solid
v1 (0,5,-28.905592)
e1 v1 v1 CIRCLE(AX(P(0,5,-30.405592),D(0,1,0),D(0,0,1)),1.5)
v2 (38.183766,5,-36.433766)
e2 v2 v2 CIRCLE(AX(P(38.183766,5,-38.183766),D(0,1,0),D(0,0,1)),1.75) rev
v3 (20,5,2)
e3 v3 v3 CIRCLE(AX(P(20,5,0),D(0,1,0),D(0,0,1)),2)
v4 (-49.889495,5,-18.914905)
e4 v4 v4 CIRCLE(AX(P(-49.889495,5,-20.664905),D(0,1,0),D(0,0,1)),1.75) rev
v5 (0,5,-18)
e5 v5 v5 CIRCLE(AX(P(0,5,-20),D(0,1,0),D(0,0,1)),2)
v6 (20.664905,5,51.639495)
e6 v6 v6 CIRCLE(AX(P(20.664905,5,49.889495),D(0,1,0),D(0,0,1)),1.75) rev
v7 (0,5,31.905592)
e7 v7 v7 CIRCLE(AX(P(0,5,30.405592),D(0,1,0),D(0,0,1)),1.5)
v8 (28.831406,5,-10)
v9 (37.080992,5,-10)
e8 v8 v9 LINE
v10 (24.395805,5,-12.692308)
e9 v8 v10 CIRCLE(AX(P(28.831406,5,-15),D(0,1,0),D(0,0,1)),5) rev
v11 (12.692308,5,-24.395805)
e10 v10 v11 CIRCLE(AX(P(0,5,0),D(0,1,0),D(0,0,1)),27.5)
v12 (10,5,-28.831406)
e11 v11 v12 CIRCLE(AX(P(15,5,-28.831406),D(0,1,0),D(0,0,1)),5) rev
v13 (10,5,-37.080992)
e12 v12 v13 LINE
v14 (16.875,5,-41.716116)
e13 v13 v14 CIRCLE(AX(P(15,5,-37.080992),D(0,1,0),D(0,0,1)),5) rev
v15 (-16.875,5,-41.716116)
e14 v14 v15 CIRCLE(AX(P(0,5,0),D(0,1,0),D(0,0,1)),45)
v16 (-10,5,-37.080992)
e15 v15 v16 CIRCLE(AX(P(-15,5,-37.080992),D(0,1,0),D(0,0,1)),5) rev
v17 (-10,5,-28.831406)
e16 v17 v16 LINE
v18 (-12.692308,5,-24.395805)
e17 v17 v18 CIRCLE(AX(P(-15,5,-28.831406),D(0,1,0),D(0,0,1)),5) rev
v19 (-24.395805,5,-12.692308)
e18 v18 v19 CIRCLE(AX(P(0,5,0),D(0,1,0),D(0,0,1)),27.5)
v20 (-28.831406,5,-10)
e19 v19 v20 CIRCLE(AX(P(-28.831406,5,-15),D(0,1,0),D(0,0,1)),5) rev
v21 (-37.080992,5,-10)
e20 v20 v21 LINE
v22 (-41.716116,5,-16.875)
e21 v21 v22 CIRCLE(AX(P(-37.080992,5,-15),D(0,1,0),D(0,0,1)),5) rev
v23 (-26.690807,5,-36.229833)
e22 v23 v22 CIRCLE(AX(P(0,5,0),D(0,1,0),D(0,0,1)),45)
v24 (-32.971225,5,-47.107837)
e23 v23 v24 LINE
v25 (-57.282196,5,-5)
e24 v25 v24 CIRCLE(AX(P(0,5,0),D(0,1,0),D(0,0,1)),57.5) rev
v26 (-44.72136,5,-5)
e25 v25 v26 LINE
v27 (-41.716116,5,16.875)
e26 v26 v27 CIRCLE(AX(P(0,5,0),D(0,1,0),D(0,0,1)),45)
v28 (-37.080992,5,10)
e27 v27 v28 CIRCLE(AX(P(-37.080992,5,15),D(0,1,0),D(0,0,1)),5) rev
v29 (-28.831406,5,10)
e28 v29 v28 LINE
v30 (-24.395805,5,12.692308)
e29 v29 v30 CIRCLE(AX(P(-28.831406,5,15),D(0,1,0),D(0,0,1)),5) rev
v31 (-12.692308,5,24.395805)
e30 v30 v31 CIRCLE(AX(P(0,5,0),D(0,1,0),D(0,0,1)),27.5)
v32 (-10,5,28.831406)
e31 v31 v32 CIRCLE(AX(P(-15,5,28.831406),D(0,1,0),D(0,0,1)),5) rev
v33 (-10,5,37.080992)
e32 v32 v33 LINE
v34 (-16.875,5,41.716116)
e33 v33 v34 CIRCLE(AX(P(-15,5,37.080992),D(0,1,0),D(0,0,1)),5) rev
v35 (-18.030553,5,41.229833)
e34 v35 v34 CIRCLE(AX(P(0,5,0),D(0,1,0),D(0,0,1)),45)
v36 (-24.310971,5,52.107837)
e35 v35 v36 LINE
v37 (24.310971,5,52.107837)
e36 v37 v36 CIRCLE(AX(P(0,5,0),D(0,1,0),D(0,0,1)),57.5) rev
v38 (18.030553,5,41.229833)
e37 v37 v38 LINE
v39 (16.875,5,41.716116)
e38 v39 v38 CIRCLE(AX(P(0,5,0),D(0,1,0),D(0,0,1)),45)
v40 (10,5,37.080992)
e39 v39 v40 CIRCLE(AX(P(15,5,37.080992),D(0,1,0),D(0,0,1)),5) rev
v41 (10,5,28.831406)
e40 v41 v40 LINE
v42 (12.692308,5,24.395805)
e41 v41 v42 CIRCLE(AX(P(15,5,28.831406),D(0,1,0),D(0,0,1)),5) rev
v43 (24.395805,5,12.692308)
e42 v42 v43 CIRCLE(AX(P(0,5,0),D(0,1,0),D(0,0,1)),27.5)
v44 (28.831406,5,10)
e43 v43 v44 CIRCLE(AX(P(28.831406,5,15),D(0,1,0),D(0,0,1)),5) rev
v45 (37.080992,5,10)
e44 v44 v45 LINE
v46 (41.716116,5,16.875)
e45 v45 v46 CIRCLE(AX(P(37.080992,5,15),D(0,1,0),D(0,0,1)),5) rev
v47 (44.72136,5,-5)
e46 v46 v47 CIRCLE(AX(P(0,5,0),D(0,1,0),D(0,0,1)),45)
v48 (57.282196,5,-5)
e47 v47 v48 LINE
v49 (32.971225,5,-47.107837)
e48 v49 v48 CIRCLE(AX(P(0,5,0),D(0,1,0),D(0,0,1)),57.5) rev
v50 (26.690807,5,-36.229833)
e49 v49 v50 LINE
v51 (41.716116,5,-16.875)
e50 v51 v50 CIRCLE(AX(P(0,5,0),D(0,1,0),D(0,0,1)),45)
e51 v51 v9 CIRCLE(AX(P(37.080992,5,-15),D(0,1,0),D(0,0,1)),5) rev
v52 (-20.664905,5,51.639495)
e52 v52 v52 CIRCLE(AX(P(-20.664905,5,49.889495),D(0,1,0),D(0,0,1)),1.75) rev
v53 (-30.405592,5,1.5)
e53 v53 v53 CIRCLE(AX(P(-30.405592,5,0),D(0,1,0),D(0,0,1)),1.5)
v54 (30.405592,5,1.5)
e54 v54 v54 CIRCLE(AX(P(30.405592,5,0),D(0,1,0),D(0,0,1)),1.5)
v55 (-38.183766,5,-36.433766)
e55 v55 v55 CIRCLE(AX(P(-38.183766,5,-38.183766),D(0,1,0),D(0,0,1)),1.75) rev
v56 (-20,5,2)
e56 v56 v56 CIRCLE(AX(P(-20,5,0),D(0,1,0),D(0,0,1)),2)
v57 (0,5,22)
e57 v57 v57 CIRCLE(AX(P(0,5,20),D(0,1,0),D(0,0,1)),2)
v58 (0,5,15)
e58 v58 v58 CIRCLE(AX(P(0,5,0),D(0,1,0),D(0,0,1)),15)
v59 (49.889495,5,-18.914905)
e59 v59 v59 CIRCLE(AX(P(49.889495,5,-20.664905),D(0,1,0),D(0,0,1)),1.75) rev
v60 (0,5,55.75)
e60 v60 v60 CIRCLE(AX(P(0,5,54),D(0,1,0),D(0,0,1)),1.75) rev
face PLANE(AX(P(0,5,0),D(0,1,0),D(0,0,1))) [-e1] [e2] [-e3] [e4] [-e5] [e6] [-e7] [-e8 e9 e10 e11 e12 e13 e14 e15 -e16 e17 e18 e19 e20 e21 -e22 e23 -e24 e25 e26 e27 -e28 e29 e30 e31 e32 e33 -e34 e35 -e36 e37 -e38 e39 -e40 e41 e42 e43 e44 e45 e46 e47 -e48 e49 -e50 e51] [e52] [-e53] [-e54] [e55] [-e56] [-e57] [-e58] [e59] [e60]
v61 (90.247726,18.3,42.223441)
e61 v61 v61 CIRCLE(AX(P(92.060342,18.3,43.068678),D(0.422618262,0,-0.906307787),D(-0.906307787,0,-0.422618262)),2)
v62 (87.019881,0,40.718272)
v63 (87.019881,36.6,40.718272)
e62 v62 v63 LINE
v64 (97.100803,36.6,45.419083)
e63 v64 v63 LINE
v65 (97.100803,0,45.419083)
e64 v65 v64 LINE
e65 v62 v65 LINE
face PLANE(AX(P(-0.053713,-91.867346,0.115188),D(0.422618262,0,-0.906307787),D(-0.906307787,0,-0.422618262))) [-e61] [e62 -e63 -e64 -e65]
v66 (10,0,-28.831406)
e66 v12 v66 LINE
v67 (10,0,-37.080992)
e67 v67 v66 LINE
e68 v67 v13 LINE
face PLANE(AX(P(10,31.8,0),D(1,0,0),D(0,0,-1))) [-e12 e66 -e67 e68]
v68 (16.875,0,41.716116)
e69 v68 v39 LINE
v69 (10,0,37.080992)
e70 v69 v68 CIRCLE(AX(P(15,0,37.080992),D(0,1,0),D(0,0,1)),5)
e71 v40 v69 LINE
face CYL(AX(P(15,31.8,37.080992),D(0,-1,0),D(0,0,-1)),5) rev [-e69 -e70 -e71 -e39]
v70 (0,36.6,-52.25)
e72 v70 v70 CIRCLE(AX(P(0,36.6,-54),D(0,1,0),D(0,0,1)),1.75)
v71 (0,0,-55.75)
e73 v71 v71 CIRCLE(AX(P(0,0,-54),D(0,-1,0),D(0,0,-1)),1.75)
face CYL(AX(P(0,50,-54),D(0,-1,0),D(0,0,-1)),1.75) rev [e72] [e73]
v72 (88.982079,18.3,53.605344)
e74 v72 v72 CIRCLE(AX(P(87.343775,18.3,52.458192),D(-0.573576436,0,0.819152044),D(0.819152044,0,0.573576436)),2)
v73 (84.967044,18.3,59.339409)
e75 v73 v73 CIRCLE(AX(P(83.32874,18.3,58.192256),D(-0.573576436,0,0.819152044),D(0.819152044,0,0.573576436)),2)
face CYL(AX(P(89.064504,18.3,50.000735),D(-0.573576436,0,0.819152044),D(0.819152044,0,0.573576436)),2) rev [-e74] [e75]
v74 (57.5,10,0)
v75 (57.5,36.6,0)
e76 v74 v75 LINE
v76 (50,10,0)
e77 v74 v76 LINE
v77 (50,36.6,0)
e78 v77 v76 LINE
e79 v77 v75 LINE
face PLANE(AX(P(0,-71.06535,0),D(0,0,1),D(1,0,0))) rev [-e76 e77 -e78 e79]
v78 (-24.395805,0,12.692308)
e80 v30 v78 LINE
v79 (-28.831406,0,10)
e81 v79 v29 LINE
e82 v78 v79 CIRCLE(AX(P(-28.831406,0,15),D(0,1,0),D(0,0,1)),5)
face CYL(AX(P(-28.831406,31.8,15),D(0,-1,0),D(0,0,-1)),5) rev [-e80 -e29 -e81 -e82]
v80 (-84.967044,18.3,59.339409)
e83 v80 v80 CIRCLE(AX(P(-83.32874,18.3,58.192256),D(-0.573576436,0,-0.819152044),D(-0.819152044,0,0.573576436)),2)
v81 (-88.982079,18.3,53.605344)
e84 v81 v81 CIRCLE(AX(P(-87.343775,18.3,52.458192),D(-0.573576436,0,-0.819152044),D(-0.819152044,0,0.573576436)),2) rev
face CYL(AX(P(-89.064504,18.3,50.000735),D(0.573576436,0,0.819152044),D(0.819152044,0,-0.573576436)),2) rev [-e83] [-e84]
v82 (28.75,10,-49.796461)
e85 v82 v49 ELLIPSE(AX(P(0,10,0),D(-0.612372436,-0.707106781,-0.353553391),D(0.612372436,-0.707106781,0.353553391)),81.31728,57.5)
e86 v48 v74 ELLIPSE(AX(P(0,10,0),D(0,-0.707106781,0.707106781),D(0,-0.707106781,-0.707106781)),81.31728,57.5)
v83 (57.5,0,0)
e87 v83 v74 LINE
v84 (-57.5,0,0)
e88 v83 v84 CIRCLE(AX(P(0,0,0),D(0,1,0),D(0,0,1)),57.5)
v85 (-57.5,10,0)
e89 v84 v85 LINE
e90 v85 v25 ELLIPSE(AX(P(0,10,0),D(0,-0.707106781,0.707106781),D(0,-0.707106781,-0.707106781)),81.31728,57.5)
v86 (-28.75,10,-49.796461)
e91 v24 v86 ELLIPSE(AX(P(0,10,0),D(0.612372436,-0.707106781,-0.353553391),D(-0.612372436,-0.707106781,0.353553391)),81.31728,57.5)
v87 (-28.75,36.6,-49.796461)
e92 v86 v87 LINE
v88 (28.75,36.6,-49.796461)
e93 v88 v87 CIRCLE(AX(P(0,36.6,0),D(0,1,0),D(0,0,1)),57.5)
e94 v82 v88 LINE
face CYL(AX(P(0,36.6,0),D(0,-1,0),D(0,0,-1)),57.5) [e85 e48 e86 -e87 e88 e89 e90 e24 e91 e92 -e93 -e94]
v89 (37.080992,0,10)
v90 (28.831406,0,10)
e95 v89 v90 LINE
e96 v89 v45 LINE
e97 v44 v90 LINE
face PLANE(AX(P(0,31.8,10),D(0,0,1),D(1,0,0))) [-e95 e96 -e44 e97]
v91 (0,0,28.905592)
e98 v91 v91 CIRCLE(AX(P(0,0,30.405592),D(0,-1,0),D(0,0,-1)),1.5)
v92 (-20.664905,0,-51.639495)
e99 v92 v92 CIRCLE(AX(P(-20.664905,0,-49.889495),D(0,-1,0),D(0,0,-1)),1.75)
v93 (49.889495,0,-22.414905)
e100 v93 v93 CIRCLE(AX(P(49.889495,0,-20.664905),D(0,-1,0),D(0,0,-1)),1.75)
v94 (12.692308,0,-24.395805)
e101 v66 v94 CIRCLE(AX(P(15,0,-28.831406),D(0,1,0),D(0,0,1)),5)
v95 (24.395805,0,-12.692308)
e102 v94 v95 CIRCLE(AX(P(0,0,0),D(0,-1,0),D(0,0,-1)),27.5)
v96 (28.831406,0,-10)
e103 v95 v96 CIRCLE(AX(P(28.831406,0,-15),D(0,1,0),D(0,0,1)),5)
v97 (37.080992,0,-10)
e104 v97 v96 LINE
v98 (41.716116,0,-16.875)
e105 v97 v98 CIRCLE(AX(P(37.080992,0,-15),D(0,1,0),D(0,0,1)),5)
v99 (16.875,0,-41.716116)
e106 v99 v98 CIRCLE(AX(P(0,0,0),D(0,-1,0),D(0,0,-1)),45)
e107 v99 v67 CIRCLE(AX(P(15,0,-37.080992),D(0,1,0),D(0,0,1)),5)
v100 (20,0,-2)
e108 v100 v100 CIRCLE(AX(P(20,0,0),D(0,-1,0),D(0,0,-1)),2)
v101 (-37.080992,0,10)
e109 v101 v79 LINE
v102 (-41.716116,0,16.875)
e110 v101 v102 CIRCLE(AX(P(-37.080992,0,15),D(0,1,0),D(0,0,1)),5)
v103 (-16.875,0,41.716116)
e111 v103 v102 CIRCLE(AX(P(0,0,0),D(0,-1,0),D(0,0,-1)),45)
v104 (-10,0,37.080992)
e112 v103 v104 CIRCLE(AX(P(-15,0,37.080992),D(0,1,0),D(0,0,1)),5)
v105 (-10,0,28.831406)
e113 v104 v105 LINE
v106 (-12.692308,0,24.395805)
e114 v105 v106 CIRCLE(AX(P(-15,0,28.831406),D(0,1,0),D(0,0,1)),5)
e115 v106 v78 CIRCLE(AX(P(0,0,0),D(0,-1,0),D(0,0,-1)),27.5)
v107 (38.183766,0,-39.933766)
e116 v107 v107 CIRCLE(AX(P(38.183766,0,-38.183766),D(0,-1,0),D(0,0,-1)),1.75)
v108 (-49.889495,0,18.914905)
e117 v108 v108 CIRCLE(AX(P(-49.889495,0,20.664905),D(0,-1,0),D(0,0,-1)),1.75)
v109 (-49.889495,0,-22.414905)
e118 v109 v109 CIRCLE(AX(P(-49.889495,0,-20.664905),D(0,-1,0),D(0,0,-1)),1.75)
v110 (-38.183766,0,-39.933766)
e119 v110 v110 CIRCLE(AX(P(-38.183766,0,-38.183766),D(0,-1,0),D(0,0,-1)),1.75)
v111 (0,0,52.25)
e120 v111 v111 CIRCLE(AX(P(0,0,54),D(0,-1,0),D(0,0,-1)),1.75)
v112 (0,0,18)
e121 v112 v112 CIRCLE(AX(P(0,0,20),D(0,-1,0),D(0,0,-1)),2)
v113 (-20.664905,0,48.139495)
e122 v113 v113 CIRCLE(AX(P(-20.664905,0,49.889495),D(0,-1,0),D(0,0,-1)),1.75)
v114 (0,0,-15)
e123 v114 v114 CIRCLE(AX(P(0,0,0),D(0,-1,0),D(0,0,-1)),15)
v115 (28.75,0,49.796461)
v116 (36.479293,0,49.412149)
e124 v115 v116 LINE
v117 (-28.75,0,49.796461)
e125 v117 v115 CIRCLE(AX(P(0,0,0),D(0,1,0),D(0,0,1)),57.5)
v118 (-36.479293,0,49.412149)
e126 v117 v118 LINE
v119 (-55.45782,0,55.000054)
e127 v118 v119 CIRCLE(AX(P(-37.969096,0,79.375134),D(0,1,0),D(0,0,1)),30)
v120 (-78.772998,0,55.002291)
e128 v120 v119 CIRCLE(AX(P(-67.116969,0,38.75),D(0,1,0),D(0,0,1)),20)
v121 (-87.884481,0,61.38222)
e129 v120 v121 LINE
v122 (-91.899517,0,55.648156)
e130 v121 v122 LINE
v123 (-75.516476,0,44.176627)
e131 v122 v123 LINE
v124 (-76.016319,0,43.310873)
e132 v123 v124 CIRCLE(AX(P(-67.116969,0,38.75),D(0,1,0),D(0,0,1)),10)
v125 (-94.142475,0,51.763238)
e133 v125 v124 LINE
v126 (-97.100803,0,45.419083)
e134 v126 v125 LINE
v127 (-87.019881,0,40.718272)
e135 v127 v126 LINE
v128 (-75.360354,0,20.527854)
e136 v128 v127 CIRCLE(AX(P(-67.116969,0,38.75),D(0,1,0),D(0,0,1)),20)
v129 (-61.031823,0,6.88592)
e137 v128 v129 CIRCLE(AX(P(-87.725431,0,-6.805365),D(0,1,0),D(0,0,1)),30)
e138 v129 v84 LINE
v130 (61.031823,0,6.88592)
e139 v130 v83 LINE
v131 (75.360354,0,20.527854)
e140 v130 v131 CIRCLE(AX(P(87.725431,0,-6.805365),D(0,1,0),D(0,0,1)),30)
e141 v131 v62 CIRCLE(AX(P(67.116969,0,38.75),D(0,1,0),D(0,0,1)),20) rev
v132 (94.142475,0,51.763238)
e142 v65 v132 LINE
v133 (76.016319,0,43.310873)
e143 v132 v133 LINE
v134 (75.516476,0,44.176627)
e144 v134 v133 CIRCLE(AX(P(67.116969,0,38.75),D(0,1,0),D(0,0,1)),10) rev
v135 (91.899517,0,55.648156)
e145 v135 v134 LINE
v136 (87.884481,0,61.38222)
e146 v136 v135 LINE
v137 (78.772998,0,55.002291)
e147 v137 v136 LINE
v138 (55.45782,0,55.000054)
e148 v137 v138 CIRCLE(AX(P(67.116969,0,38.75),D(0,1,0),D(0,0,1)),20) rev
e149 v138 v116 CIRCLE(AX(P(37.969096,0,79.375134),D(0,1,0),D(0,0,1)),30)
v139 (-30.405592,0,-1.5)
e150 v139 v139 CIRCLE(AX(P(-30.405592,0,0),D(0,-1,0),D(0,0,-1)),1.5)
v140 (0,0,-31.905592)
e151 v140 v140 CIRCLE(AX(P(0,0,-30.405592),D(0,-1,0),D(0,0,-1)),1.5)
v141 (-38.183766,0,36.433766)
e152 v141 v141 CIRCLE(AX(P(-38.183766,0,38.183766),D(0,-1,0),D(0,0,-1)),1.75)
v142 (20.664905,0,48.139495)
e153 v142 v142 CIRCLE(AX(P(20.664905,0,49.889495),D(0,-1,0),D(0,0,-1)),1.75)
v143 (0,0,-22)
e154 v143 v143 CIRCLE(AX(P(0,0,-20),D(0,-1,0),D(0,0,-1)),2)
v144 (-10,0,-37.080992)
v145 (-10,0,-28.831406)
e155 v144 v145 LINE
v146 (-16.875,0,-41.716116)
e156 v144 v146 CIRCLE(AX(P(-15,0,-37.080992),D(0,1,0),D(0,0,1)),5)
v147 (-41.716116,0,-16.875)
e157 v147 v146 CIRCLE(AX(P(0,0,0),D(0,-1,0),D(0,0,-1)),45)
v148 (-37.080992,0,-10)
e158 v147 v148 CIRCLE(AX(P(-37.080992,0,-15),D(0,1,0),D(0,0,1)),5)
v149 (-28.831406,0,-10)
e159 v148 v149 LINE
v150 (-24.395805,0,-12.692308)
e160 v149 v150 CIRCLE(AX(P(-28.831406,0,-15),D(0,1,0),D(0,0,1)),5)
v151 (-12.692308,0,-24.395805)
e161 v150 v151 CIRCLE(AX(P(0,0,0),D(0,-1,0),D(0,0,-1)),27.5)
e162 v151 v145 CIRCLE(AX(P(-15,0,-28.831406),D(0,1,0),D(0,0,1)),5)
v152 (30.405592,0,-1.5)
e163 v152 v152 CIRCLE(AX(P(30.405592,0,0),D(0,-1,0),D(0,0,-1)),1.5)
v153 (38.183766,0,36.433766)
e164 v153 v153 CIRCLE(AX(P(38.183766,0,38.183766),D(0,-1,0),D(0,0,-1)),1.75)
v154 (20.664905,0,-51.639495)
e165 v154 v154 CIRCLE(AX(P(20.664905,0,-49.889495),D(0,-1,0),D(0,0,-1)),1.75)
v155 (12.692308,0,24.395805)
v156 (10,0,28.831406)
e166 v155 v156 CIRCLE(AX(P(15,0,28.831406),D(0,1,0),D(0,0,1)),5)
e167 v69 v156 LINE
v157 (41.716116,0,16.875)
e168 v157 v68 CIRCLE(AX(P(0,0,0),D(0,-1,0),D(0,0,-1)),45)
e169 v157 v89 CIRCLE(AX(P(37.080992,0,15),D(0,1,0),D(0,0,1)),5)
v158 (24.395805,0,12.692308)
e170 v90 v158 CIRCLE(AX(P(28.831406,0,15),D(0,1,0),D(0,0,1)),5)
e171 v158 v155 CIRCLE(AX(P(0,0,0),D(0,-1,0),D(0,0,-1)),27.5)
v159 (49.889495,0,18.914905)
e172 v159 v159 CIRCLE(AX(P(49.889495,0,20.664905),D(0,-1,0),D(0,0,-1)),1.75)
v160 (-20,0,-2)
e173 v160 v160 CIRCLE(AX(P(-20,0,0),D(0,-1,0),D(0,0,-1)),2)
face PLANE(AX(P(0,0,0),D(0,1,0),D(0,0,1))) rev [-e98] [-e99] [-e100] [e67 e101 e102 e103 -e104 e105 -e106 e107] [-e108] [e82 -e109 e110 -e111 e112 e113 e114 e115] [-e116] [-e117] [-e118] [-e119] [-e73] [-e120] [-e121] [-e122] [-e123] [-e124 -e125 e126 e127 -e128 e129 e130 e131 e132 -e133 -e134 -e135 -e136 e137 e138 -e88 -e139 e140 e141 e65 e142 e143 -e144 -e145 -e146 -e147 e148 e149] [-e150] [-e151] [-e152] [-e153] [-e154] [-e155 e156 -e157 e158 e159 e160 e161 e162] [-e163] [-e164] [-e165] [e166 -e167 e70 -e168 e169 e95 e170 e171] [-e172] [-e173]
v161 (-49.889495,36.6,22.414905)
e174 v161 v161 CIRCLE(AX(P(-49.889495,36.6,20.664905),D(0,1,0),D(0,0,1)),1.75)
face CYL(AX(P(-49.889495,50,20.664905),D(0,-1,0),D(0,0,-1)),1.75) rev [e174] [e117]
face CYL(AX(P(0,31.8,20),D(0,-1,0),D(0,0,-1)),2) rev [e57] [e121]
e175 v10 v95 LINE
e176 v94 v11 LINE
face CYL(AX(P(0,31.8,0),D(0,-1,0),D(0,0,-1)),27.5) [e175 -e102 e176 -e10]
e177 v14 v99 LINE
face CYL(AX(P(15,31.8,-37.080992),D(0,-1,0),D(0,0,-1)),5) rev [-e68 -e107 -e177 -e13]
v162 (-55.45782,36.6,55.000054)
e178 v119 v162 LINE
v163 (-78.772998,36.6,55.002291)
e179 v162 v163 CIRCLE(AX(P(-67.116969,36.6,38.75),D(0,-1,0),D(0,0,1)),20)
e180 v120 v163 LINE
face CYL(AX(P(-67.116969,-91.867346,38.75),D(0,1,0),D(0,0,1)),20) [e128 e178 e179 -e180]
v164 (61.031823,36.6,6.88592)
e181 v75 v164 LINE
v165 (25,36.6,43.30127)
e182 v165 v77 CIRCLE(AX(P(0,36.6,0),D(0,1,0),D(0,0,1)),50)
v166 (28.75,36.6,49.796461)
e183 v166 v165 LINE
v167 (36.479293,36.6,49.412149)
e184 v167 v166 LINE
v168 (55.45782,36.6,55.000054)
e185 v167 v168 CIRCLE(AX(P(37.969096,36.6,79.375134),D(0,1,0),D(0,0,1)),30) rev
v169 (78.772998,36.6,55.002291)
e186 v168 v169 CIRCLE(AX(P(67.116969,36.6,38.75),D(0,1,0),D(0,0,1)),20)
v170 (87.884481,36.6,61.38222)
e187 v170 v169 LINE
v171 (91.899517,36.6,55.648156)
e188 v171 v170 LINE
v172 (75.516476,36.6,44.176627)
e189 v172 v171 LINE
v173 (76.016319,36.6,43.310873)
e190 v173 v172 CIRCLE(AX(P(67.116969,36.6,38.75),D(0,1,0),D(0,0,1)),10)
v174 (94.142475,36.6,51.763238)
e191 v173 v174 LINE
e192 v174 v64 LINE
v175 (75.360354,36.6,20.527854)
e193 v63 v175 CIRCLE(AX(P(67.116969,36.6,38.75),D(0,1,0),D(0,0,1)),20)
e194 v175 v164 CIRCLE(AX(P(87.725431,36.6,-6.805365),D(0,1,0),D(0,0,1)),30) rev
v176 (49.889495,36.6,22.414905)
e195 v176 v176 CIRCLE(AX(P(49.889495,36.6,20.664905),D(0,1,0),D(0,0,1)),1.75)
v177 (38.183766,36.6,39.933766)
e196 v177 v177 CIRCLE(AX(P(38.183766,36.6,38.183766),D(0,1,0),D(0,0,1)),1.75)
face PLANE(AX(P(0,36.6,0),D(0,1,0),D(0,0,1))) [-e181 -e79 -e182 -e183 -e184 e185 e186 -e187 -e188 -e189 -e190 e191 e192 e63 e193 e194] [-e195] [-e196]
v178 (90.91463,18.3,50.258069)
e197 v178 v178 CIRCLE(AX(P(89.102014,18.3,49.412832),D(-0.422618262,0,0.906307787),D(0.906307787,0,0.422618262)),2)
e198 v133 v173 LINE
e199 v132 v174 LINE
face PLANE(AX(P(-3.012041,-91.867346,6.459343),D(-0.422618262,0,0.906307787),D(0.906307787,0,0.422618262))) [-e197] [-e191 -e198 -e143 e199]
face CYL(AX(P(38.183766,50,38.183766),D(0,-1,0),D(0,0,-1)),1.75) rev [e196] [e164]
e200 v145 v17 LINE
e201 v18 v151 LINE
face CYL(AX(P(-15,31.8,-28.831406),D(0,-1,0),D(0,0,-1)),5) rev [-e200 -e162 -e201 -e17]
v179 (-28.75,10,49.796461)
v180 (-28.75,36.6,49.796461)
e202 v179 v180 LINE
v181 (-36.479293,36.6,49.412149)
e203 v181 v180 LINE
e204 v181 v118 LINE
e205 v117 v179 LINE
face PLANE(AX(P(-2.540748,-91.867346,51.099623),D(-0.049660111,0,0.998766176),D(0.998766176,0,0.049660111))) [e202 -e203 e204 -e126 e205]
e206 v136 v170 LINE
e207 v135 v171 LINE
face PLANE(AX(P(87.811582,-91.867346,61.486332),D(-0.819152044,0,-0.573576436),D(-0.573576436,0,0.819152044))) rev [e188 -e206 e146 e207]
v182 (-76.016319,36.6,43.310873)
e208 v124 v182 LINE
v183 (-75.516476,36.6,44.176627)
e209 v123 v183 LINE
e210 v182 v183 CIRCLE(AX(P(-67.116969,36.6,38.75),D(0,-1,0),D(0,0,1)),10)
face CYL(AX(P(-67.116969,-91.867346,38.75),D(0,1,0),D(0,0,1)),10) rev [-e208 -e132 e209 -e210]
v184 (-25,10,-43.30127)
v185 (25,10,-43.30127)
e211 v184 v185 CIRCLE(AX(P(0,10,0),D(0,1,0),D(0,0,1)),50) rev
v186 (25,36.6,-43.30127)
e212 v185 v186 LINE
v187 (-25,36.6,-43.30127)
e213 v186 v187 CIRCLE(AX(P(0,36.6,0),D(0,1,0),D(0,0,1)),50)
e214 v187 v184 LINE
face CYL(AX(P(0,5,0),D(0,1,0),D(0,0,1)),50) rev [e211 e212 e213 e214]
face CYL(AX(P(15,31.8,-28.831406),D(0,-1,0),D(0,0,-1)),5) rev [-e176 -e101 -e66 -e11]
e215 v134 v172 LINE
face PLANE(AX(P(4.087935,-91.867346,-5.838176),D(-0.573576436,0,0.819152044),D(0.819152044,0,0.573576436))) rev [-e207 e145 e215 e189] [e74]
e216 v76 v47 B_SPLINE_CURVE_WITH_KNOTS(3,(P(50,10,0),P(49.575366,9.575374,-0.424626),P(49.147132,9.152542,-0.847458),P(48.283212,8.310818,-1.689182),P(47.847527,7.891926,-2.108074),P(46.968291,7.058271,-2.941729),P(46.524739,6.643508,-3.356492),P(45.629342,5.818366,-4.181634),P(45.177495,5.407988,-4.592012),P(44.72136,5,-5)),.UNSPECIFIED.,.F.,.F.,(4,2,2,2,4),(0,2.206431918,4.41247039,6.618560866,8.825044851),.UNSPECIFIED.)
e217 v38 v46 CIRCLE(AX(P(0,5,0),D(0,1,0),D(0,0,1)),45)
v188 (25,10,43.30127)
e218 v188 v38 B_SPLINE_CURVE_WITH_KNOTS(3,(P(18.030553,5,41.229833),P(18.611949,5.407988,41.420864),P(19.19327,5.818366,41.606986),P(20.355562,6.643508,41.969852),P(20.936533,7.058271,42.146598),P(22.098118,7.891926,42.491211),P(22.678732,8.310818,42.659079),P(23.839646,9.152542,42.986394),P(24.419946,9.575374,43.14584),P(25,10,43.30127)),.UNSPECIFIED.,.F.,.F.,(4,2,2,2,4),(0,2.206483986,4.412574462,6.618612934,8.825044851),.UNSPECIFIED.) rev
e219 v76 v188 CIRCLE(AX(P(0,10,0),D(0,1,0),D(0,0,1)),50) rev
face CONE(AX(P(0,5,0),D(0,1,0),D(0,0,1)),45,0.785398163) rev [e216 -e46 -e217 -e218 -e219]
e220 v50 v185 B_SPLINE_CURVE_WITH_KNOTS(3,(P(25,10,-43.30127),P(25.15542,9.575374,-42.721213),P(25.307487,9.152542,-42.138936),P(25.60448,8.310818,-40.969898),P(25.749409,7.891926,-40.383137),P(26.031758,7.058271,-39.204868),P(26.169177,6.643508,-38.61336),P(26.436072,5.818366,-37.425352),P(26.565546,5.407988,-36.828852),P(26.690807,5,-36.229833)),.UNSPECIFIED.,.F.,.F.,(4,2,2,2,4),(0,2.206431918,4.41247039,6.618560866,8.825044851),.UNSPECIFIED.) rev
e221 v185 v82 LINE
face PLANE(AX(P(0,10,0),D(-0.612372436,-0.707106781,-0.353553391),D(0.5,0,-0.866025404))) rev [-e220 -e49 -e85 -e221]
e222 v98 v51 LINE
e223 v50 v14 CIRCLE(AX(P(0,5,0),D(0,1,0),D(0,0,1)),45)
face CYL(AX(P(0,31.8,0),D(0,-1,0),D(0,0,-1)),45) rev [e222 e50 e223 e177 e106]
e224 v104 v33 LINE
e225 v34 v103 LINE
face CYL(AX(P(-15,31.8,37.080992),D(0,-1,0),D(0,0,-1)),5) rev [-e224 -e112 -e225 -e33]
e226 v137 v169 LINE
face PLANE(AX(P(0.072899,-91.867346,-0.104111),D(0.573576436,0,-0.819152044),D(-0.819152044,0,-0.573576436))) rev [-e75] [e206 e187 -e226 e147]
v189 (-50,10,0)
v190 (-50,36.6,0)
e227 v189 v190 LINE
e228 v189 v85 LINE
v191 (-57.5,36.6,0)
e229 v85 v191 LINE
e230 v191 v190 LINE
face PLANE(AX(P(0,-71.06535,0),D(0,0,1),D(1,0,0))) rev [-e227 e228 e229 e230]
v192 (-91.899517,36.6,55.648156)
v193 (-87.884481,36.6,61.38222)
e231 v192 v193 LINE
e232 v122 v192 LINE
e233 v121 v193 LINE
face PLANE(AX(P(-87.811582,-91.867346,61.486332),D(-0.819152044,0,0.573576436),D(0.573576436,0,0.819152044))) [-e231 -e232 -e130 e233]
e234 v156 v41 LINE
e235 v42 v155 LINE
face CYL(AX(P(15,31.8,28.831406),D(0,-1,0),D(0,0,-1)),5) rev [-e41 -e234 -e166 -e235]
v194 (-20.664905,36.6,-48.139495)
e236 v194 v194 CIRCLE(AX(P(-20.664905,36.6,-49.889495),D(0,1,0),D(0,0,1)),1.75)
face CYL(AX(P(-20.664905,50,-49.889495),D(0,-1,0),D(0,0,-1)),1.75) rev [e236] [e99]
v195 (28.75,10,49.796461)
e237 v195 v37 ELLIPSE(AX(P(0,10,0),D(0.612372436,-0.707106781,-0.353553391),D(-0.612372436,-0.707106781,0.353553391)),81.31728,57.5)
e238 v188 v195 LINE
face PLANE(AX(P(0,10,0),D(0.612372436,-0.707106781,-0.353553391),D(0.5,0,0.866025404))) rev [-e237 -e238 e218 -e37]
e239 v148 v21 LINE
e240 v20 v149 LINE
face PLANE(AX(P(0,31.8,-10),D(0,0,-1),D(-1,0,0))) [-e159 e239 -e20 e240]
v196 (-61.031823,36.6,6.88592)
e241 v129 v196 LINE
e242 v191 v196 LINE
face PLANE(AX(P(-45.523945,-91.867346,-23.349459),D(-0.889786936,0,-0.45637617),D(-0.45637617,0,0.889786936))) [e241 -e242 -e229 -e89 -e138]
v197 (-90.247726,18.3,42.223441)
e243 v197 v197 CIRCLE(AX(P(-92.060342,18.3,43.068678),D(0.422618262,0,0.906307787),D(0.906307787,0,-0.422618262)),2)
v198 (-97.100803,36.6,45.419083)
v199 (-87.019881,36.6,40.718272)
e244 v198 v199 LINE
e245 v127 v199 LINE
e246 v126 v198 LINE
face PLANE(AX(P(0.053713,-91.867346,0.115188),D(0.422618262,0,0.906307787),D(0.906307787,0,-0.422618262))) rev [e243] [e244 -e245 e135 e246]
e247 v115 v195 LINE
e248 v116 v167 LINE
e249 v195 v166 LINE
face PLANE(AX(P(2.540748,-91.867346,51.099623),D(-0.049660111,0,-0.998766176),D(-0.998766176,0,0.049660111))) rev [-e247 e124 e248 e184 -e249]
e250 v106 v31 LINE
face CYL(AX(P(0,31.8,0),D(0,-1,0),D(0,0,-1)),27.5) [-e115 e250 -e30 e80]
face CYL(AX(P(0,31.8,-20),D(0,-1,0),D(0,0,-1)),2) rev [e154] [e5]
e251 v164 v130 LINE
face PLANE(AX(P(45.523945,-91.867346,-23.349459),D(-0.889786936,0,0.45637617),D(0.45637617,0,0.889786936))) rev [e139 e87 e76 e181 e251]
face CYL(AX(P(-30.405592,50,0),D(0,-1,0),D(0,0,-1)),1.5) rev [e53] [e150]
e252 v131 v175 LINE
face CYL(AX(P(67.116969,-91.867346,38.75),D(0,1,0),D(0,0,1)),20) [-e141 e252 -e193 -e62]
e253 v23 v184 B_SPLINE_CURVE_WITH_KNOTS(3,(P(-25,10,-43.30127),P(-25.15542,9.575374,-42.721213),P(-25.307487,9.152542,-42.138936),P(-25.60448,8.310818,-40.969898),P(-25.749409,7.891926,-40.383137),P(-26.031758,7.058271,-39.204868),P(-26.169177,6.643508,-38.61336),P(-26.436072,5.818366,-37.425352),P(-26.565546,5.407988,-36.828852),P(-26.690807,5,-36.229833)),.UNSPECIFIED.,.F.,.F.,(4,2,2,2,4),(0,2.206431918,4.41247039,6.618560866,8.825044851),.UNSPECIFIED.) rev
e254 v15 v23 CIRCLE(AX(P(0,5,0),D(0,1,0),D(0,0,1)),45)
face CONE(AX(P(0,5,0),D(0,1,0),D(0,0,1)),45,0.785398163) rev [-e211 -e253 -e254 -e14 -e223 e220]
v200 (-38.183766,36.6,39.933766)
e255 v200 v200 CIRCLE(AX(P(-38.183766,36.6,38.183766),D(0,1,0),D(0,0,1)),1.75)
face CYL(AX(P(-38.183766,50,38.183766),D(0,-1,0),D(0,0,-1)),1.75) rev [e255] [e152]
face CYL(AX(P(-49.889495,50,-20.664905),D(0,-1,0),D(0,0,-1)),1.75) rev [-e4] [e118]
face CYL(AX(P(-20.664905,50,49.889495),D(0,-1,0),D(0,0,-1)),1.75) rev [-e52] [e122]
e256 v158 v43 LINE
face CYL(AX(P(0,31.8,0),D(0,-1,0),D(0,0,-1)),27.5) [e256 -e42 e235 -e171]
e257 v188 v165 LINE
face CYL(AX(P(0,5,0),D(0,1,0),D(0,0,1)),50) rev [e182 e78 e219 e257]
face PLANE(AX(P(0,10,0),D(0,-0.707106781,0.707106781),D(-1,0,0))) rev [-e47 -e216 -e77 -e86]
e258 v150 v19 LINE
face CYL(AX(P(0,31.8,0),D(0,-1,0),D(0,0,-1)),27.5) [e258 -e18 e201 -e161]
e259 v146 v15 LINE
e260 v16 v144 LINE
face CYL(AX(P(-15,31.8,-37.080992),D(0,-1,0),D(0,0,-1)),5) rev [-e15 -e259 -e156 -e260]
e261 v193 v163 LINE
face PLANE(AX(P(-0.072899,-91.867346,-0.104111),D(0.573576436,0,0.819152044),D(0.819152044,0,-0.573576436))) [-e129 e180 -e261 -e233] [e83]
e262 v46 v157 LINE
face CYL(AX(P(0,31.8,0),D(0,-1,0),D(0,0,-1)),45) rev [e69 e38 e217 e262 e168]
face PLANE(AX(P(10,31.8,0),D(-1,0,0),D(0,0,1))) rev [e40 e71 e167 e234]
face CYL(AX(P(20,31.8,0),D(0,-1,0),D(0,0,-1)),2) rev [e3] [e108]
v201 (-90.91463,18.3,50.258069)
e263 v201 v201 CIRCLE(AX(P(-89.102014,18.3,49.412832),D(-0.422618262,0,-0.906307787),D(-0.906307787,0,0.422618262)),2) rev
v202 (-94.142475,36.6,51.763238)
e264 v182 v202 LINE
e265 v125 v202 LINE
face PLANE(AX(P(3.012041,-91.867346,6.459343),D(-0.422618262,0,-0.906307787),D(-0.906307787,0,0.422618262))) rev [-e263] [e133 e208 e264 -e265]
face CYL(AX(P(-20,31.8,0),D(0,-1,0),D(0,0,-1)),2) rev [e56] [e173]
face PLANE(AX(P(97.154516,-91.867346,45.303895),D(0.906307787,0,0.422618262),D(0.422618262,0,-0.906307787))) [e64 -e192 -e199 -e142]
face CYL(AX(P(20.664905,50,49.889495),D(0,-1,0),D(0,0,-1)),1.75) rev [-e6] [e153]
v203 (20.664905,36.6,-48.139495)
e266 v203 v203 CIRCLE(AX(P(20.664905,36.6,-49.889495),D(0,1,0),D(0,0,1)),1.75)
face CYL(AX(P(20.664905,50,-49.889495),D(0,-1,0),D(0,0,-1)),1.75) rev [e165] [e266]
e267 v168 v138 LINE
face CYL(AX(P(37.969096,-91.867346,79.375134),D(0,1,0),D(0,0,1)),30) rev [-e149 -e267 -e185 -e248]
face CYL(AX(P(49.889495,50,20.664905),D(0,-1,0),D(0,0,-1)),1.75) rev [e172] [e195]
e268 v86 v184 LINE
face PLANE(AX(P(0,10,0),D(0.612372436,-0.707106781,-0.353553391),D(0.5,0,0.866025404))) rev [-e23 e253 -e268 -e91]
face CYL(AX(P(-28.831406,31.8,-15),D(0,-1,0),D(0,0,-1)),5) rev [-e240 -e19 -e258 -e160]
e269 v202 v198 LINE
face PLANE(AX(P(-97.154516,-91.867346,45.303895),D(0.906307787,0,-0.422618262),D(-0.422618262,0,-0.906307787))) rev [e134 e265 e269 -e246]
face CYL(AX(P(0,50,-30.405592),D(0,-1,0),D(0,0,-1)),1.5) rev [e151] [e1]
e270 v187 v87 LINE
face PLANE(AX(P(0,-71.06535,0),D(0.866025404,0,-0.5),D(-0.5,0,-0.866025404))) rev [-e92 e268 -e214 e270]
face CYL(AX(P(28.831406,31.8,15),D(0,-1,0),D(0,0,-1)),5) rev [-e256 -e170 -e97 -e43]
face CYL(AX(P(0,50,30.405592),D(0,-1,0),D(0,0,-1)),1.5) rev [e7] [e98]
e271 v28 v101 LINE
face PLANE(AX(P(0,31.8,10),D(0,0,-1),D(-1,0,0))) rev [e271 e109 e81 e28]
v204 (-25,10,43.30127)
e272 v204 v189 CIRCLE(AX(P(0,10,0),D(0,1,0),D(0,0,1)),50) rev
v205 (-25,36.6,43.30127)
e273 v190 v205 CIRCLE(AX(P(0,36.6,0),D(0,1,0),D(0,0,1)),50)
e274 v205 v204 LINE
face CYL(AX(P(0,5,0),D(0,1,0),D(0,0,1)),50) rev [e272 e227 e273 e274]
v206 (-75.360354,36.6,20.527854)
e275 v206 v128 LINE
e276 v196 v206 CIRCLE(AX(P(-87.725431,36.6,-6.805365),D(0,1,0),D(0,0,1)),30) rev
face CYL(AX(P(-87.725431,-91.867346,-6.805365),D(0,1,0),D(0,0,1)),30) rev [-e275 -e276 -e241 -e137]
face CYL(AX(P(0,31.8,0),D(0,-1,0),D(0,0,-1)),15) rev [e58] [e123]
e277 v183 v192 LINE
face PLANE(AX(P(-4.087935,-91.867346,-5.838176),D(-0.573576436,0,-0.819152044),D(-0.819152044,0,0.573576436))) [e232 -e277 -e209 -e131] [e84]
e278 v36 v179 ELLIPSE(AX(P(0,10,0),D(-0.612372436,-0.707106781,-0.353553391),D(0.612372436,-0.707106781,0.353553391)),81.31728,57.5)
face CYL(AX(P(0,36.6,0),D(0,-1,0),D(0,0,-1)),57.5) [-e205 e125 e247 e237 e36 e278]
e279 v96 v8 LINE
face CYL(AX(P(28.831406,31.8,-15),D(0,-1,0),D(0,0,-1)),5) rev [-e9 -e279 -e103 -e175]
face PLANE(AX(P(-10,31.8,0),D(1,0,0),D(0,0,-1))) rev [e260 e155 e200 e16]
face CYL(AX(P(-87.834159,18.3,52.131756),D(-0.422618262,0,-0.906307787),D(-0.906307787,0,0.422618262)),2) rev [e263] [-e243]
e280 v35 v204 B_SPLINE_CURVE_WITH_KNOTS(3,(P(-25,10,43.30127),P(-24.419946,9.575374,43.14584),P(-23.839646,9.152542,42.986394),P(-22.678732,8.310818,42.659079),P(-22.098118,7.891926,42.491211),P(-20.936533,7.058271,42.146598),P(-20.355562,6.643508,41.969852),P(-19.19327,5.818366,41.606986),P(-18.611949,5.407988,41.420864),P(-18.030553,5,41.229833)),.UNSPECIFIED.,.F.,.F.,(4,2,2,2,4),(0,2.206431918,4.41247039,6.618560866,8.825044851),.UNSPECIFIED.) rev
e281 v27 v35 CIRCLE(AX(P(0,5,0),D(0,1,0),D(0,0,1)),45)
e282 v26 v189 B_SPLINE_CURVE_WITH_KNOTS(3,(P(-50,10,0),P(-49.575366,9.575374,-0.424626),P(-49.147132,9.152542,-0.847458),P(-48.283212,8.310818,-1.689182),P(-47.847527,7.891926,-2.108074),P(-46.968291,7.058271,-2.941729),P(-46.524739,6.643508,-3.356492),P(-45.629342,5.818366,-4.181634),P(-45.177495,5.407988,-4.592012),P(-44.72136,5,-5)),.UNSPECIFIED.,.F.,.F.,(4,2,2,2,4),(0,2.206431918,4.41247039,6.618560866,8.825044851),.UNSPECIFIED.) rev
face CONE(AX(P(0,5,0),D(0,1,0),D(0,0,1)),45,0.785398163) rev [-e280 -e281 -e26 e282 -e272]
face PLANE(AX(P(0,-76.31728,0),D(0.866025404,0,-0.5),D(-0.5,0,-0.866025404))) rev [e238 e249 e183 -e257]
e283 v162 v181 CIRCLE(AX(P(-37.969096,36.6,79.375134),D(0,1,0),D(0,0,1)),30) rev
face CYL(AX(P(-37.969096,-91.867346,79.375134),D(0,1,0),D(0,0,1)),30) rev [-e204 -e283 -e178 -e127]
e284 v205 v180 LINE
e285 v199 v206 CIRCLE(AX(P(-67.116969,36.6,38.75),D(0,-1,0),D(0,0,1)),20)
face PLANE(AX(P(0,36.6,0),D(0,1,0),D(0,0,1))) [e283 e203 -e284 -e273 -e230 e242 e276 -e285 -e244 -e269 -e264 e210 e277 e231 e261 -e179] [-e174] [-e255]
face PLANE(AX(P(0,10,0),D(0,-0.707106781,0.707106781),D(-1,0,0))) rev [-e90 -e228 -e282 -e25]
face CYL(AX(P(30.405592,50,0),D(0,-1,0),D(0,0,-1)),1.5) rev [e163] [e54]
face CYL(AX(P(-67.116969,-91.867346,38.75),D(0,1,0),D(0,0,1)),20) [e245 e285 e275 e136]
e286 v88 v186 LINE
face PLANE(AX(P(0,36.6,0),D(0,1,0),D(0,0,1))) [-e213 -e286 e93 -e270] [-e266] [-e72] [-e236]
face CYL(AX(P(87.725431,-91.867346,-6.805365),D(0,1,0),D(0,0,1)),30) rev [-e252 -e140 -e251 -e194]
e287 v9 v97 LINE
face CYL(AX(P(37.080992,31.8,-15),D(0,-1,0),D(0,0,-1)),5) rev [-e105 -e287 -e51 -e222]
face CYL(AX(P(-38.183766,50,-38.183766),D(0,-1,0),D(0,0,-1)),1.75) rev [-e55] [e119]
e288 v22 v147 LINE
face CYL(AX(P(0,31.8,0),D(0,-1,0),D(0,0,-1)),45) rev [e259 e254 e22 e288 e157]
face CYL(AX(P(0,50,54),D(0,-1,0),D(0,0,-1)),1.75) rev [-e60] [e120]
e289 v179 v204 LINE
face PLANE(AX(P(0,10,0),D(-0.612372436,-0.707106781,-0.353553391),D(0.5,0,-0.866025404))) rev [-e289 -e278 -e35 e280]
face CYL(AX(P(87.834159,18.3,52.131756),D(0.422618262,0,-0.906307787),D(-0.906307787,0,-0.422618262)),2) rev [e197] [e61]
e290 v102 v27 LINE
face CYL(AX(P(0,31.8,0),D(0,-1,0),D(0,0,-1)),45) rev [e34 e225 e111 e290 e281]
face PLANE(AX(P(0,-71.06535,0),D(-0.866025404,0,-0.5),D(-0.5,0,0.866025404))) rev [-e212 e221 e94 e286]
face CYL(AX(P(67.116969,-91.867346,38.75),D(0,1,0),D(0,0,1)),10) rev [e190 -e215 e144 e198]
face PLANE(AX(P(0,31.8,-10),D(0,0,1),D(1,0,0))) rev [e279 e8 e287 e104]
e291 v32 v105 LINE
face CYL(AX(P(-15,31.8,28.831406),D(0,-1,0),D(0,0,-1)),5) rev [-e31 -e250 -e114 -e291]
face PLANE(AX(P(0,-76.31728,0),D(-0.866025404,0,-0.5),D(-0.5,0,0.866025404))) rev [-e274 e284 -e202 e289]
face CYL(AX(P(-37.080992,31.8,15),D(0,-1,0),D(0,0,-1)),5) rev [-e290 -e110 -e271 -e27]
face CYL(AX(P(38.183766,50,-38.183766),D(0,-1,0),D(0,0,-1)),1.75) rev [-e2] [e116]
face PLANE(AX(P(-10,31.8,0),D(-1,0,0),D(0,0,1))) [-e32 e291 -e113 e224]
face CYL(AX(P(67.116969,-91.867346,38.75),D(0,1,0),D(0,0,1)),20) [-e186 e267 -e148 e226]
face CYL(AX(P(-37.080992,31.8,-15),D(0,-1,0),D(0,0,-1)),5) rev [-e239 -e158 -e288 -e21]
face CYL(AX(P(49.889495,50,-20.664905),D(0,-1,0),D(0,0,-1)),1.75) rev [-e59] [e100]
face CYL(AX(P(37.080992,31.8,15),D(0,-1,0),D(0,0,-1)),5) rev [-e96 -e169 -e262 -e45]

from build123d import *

# Parameters (mm, degrees)
SKETCH1_R            = 57.5
BOSS_EXTRUDE1_DEPTH  = 36.6
SKETCH2_R            = 50
CUT_EXTRUDE1_DEPTH   = 31.6
SKETCH3_R            = 2
SKETCH3_R_2          = 15
CUT_EXTRUDE2_DEPTH   = 31.8
SKETCH4_R            = 1.5
SKETCH4_R_2          = 1.75
CUT_EXTRUDE3_DEPTH   = 50
CUT_EXTRUDE4_START   = -31.6
CUT_EXTRUDE4_DEPTH   = 31.6
CIRPATTERN1_COUNT    = 3
FILLET2_R            = 5
CHAMFER1_SIZE        = 5
BOSS_EXTRUDE2_REACH  = 91.174
FILLET3_R            = 30
SKETCH7_R            = 2
CUT_EXTRUDE5_DEPTH   = 10
SKETCH8_R            = 2
CUT_EXTRUDE6_DEPTH   = 10
FILLET3_OF_MIRROR1_R = 30


with BuildPart() as part:
    # Sketch1 → Boss-Extrude1 (new body)
    with BuildSketch(Plane(origin=(0, 0, 0), x_dir=(1, 0, 0), z_dir=(0, 1, 0))):
        with Locations(Location((0, 0, 0), (0, 0, 270))):
            Circle(SKETCH1_R)
    extrude(amount=BOSS_EXTRUDE1_DEPTH)

    # Sketch2 → Cut-Extrude1 (cut)
    with BuildSketch(Plane(origin=(0, 36.6, 0), x_dir=(1, 0, 0), z_dir=(0, 1, 0))):
        with Locations(Location((0, 0, 0), (0, 0, 270))):
            Circle(SKETCH2_R)
    extrude(amount=-CUT_EXTRUDE1_DEPTH, mode=Mode.SUBTRACT)

    # Sketch3 → Cut-Extrude2 (cut)
    with BuildSketch(Plane.XZ):
        with BuildLine():
            Line((-10, 25.617376915), (-10, 43.874821937))
            ThreePointArc((-10, 43.874821937), (-31.819805153, 31.819805153), (-43.874821937, 10))
            Line((-43.874821937, 10), (-25.617376915, 10))
            ThreePointArc((-25.617376915, 10), (-19.445436483, 19.445436483), (-10, 25.617376915))
        make_face()
        with BuildLine():
            Line((25.617376915, 10), (43.874821937, 10))
            ThreePointArc((43.874821937, 10), (31.819805153, 31.819805153), (10, 43.874821937))
            Line((10, 43.874821937), (10, 25.617376915))
            ThreePointArc((10, 25.617376915), (19.445436483, 19.445436483), (25.617376915, 10))
        make_face()
        with BuildLine():
            ThreePointArc((10, -43.874821937), (31.819805153, -31.819805153), (43.874821937, -10))
            Line((43.874821937, -10), (25.617376915, -10))
            ThreePointArc((25.617376915, -10), (19.445436483, -19.445436483), (10, -25.617376915))
            Line((10, -25.617376915), (10, -43.874821937))
        make_face()
        with BuildLine():
            ThreePointArc((-43.874821937, -10), (-31.819805153, -31.819805153), (-10, -43.874821937))
            Line((-10, -43.874821937), (-10, -25.617376915))
            ThreePointArc((-10, -25.617376915), (-19.445436483, -19.445436483), (-25.617376915, -10))
            Line((-25.617376915, -10), (-43.874821937, -10))
        make_face()
        with Locations(Location((-20, 0, 0), (0, 0, 270))):
            Circle(SKETCH3_R)
        with Locations(Location((0, 0, 0), (0, 0, 270))):
            Circle(SKETCH3_R_2)
        with Locations(Location((0, 20, 0), (0, 0, 270))):
            Circle(SKETCH3_R)
        with Locations(Location((20, 0, 0), (0, 0, 270))):
            Circle(SKETCH3_R)
        with Locations(Location((0, -20, 0), (0, 0, 270))):
            Circle(SKETCH3_R)
    extrude(amount=-CUT_EXTRUDE2_DEPTH, mode=Mode.SUBTRACT)

    # Sketch4 → Cut-Extrude3 (cut)
    with BuildSketch(Plane.XZ):
        with Locations(Location((0, 30.405591591, 0), (0, 0, 270))):
            Circle(SKETCH4_R)
        with Locations(Location((30.405591591, 0, 0), (0, 0, 270))):
            Circle(SKETCH4_R)
        with Locations(Location((0, -30.405591591, 0), (0, 0, 270))):
            Circle(SKETCH4_R)
        with Locations(Location((-30.405591591, 0, 0), (0, 0, 270))):
            Circle(SKETCH4_R)
        with Locations(Location((0, 54, 0), (0, 0, 270))):
            Circle(SKETCH4_R_2)
        with Locations(Location((20.664905348, 49.889494756, 0), (0, 0, 270))):
            Circle(SKETCH4_R_2)
        with Locations(Location((38.183766184, 38.183766184, 0), (0, 0, 270))):
            Circle(SKETCH4_R_2)
        with Locations(Location((49.889494756, 20.664905348, 0), (0, 0, 270))):
            Circle(SKETCH4_R_2)
        with Locations(Location((49.889494756, -20.664905348, 0), (0, 0, 270))):
            Circle(SKETCH4_R_2)
        with Locations(Location((38.183766184, -38.183766184, 0), (0, 0, 270))):
            Circle(SKETCH4_R_2)
        with Locations(Location((20.664905348, -49.889494756, 0), (0, 0, 270))):
            Circle(SKETCH4_R_2)
        with Locations(Location((0, -54, 0), (0, 0, 270))):
            Circle(SKETCH4_R_2)
        with Locations(Location((-20.664905348, -49.889494756, 0), (0, 0, 270))):
            Circle(SKETCH4_R_2)
        with Locations(Location((-38.183766184, -38.183766184, 0), (0, 0, 270))):
            Circle(SKETCH4_R_2)
        with Locations(Location((-49.889494756, -20.664905348, 0), (0, 0, 270))):
            Circle(SKETCH4_R_2)
        with Locations(Location((-49.889494756, 20.664905348, 0), (0, 0, 270))):
            Circle(SKETCH4_R_2)
        with Locations(Location((-38.183766184, 38.183766184, 0), (0, 0, 270))):
            Circle(SKETCH4_R_2)
        with Locations(Location((-20.664905348, 49.889494756, 0), (0, 0, 270))):
            Circle(SKETCH4_R_2)
    extrude(amount=-CUT_EXTRUDE3_DEPTH, mode=Mode.SUBTRACT)

    # Sketch5 → Cut-Extrude4 (cut)
    with BuildSketch(Plane(origin=(0, 36.6, 0), x_dir=(1, 0, 0), z_dir=(0, 1, 0)).offset(CUT_EXTRUDE4_START)):
        with BuildLine():
            Line((0, 0), (-28.75, -49.796460718))
            ThreePointArc((-28.75, -49.796460718), (0, -57.5), (28.75, -49.796460718))
            Line((28.75, -49.796460718), (0, 0))
        make_face()
    cut_extrude4 = extrude(amount=CUT_EXTRUDE4_DEPTH, mode=Mode.SUBTRACT)

    # CirPattern1: Cut-Extrude4 ×3 about axis
    cirpattern1_axis = Axis((0, 0, 0), (0, 1, 0))
    for i in range(1, CIRPATTERN1_COUNT):
        add(cut_extrude4.rotate(cirpattern1_axis, i * 360 / CIRPATTERN1_COUNT), mode=Mode.SUBTRACT)

    # Fillet2
    fillet2_edges = [part.edges().sort_by_distance(p)[0] for p in [
        (43.874821937, 2.5, 10),
        (25.617376915, 2.5, 10),
        (10, 2.5, 25.617376915),
        (10, 2.5, 43.874821937),
        (10, 2.5, -43.874821937),
        (10, 2.5, -25.617376915),
        (25.617376915, 2.5, -10),
        (43.874821937, 2.5, -10),
        (-43.874821937, 2.5, -10),
        (-25.617376915, 2.5, -10),
        (-10, 2.5, -25.617376915),
        (-10, 2.5, -43.874821937),
        (-10, 2.5, 43.874821937),
        (-10, 2.5, 25.617376915),
        (-25.617376915, 2.5, 10),
        (-43.874821937, 2.5, 10),
    ]]
    fillet(fillet2_edges, radius=FILLET2_R)

    # Chamfer1
    chamfer1_edges = [part.edges().sort_by_distance(p)[0] for p in [
        (26.875, 5, 46.548865453),
        (-26.875, 5, 46.548865453),
        (-43.301270189, 5, 25),
        (-53.75, 5, 0),
        (-26.875, 5, -46.548865453),
        (0, 5, -50),
        (26.875, 5, -46.548865453),
        (53.75, 5, 0),
        (43.301270189, 5, 25),
    ]]
    chamfer(chamfer1_edges, length=CHAMFER1_SIZE - 0.0001)  # a hair under: the kernel refuses the full size

    # Boss-Extrude2: up to this face of the body (flat: up to its plane)
    boss_extrude2_end = Plane(part.part.faces().sort_by_distance((-32.969805153, 0, 32.969805153))[0])
    # Sketch6 → Boss-Extrude2 (add, up to the picked face)
    with BuildSketch(Plane(origin=(0, 36.6, 0), x_dir=(1, 0, 0), z_dir=(0, 1, 0)), mode=Mode.PRIVATE) as boss_extrude2_sk1:
        with BuildLine():
            ThreePointArc((75.516475651, -44.176627364), (58.456714755, -33.75), (76.016319376, -43.310872636))
            Line((76.016319376, -43.310872636), (94.142475117, -51.763237871))
            Line((94.142475117, -51.763237871), (97.100802949, -45.419083361))
            Line((97.100802949, -45.419083361), (87.01988076, -40.718272143))
            ThreePointArc((87.01988076, -40.718272143), (81.93866645, -25.321773067), (67.116968793, -18.75))
            Line((67.116968793, -18.75), (57.5, 0))
            ThreePointArc((57.5, 0), (49.796460718, -28.75), (28.75, -49.796460718))
            Line((28.75, -49.796460718), (49.796460718, -48.75))
            ThreePointArc((49.796460718, -48.75), (62.89863197, -58.300080165), (78.772998455, -55.002291301))
            Line((78.772998455, -55.002291301), (87.884481482, -61.382220401))
            Line((87.884481482, -61.382220401), (91.899516537, -55.648156091))
            Line((91.899516537, -55.648156091), (75.516475651, -44.176627364))
        make_face()
    boss_extrude2_tool1 = split(extrude(boss_extrude2_sk1.sketch, amount=-BOSS_EXTRUDE2_REACH, mode=Mode.PRIVATE), bisect_by=boss_extrude2_end, keep=Keep.BOTH, mode=Mode.PRIVATE)
    boss_extrude2 = boss_extrude2_tool1.solids().sort_by(Axis((50.592055, 36.6, 29.209337), (0, -1, 0)))[0]
    add(boss_extrude2)

    # Fillet3
    fillet3_edges = [part.edges().sort_by_distance(p)[0] for p in [
        (49.796460718, 18.3, 48.75),
        (67.116968793, 18.3, 18.75),
    ]]
    fillet(fillet3_edges, radius=FILLET3_R)

    # Sketch7 → Cut-Extrude5 (cut)
    with BuildSketch(Plane(origin=(-0.053713249, 0, 0.115188434), x_dir=(-0.9063077870366505, 0, -0.4226182617406986), z_dir=(0.4226182617406986, 0, -0.9063077870366505))):
        with Locations((-101.636614427, 18.3)):
            Circle(SKETCH7_R)
    cut_extrude5 = extrude(amount=-CUT_EXTRUDE5_DEPTH, mode=Mode.SUBTRACT)

    # Sketch8 → Cut-Extrude6 (cut)
    with BuildSketch(Plane(origin=(0.072899485, 0, -0.104111255), x_dir=(0.819152044288992, 0, 0.5735764363510458), z_dir=(-0.5735764363510458, 0, 0.819152044288992))):
        with Locations((101.636614427, 18.3)):
            Circle(SKETCH8_R)
    cut_extrude6 = extrude(amount=-CUT_EXTRUDE6_DEPTH, mode=Mode.SUBTRACT)

    # Mirror1: Boss-Extrude2, Cut-Extrude5, Cut-Extrude6 across plane
    add(boss_extrude2.mirror(Plane(origin=(0, 0, 0), x_dir=(0, 0, 1), z_dir=(1, 0, 0))))
    add(cut_extrude5.mirror(Plane(origin=(0, 0, 0), x_dir=(0, 0, 1), z_dir=(1, 0, 0))), mode=Mode.SUBTRACT)
    add(cut_extrude6.mirror(Plane(origin=(0, 0, 0), x_dir=(0, 0, 1), z_dir=(1, 0, 0))), mode=Mode.SUBTRACT)

    # Fillet3 of Mirror1
    fillet3_of_mirror1_edges = [part.edges().sort_by_distance(p)[0] for p in [
        (-49.796460718, 18.3, 48.75),
        (-67.116968793, 18.3, 18.75),
    ]]
    fillet(fillet3_of_mirror1_edges, radius=FILLET3_OF_MIRROR1_R)


solid = part.part
